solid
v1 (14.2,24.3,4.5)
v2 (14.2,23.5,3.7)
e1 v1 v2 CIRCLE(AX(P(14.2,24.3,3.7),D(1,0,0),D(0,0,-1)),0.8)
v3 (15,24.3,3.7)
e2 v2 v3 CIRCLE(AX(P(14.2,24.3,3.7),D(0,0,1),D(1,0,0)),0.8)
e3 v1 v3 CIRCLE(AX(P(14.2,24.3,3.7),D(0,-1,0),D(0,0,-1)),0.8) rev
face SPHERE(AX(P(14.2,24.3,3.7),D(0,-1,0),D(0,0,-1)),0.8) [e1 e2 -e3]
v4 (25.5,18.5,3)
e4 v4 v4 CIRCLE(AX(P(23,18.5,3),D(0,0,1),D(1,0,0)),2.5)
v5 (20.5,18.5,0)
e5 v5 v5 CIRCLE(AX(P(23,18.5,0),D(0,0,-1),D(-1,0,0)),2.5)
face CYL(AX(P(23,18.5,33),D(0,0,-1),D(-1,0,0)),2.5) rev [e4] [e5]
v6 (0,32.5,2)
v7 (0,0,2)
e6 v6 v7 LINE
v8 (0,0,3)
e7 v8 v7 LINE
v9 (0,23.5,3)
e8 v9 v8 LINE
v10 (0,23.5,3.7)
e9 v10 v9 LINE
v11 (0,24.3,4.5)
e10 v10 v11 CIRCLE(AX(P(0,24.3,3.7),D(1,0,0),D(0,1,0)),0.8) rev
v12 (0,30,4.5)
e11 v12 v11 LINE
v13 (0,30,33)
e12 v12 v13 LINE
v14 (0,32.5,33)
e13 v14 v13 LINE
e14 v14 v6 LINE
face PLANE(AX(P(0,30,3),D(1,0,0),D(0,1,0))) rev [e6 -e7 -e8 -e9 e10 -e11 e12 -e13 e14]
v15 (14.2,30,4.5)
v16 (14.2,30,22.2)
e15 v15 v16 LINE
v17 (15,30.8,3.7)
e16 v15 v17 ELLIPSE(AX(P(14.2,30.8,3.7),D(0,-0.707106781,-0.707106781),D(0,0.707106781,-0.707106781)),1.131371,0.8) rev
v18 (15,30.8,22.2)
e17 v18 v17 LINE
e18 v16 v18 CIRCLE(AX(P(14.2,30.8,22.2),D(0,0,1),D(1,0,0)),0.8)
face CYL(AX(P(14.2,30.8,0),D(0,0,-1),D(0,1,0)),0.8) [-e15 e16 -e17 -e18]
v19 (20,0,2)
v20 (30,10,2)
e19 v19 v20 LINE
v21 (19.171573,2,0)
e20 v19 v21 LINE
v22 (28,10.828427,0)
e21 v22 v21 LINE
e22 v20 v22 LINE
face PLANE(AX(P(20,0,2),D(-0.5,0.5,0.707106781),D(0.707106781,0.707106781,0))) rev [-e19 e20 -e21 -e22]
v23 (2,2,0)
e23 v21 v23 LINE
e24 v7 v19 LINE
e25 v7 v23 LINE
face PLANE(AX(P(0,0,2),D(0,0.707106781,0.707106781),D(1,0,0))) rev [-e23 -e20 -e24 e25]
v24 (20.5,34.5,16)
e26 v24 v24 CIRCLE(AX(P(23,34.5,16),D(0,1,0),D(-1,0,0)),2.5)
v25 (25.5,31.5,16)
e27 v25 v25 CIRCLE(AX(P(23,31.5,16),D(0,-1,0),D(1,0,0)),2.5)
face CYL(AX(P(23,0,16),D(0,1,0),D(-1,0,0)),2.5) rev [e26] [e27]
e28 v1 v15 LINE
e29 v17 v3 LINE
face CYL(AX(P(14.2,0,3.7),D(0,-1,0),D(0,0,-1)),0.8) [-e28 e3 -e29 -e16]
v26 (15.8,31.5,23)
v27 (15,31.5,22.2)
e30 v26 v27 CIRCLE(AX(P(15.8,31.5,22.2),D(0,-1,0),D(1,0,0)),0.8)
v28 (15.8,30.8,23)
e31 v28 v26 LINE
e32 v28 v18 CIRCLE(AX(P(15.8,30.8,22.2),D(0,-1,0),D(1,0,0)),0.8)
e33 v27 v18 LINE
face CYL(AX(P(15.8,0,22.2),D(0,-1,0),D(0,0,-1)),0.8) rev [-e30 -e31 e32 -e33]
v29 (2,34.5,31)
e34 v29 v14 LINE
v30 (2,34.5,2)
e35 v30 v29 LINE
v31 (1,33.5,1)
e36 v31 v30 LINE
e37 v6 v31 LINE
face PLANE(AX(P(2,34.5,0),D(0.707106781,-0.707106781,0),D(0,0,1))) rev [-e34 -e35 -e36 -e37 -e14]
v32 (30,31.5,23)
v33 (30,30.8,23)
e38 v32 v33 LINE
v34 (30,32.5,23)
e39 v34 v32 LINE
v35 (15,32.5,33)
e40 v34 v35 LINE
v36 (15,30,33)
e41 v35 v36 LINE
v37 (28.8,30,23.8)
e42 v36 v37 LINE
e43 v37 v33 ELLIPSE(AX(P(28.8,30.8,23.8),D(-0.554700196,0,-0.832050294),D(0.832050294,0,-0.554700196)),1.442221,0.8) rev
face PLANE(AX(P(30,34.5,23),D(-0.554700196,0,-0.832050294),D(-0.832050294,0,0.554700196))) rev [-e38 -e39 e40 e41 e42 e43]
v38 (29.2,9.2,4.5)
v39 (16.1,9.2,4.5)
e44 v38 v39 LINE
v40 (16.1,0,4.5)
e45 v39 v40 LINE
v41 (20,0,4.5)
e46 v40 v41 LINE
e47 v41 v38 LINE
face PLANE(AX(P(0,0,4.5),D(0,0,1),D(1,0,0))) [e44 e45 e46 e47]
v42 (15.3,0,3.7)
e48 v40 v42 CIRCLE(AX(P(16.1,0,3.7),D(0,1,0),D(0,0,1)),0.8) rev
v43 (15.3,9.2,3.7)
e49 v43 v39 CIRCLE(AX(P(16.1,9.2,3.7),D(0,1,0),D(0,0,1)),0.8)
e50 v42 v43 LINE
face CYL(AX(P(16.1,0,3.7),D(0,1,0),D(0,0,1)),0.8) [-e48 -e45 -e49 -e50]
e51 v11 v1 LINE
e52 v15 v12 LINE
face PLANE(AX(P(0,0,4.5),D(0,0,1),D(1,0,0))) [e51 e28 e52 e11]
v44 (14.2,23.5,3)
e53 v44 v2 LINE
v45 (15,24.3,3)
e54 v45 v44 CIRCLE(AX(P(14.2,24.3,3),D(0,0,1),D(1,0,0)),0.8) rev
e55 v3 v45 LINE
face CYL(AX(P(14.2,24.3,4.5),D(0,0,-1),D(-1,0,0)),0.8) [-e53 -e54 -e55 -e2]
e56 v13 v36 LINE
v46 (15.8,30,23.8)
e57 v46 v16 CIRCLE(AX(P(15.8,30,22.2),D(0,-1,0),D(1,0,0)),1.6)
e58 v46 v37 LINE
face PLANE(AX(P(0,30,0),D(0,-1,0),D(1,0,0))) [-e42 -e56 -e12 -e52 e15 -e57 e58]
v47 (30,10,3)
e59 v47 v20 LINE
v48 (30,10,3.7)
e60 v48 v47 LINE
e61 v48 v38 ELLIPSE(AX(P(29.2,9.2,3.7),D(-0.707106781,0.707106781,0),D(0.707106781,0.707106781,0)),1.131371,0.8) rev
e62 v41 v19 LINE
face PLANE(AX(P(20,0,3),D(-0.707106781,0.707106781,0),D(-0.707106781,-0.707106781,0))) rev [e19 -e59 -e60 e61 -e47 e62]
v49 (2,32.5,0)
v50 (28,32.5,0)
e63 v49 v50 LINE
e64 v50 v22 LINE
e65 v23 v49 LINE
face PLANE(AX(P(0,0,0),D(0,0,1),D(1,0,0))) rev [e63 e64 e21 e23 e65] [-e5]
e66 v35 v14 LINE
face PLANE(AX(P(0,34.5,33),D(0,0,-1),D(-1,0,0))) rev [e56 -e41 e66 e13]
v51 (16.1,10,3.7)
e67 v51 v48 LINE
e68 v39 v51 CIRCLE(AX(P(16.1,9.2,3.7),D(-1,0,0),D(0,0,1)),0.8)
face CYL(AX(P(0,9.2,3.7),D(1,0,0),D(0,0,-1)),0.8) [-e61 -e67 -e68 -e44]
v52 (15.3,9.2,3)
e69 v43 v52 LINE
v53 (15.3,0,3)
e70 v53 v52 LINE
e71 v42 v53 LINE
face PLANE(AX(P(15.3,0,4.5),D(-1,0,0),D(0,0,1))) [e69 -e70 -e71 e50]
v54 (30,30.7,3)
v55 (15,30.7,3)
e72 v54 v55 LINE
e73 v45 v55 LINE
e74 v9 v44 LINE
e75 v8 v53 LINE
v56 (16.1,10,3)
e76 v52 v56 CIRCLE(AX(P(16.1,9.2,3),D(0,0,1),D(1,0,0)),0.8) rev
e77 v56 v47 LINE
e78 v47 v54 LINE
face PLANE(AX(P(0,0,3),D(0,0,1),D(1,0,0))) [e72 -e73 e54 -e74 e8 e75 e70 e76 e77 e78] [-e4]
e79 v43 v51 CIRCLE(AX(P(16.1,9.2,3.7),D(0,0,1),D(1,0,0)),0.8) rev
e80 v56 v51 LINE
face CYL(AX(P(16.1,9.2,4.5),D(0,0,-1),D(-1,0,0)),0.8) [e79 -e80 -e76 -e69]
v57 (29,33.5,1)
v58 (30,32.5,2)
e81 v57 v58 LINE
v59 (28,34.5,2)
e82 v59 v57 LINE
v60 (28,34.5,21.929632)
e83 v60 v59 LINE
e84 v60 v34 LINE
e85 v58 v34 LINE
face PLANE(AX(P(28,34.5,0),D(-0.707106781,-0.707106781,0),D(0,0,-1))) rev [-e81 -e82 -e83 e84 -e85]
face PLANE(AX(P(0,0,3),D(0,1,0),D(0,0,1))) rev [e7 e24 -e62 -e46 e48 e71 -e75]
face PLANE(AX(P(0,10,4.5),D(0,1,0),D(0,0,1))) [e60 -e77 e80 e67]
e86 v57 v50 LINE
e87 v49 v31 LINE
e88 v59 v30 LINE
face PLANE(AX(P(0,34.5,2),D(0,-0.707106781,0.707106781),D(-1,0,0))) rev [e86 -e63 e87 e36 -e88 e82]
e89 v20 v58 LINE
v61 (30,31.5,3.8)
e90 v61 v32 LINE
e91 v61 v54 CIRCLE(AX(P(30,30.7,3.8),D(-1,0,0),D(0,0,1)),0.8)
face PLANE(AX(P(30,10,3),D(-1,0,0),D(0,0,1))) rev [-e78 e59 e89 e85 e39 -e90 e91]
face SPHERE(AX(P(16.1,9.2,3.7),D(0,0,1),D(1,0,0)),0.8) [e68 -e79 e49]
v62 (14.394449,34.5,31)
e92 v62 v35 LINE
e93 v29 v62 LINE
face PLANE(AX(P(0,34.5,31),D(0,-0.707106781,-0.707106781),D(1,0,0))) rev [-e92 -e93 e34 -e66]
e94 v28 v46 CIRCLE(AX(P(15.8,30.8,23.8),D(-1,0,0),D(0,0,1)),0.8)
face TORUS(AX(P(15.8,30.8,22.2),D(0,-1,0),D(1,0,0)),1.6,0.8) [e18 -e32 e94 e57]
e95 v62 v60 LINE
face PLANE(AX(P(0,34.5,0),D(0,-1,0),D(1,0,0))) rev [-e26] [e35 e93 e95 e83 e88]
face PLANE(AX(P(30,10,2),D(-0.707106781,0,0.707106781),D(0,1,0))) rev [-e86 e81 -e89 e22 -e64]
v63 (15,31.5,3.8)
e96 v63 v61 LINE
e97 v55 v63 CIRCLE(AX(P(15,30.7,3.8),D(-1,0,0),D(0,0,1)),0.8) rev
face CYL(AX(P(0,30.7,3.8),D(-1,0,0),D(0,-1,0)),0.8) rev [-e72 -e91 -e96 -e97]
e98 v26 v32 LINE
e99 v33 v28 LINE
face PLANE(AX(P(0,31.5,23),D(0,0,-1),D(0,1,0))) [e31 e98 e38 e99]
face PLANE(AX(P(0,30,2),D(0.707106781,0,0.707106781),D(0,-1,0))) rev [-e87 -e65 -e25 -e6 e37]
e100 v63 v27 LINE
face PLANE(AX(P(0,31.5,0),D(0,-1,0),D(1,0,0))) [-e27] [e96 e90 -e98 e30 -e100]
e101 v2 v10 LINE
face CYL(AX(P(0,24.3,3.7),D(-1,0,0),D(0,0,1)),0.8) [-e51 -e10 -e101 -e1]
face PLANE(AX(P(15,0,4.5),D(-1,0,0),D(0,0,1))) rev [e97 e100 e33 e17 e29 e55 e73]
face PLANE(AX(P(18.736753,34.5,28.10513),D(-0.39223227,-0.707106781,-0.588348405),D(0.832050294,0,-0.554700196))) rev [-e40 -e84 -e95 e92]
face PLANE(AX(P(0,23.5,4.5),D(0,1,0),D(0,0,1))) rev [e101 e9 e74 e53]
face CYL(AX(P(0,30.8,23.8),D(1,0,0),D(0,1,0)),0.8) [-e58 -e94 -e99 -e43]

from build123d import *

# Parameters (mm, degrees)
BOSS_EXTRUDE1_DEPTH = 3
SKETCH2_W           = 15
SKETCH2_H           = 6.5
BOSS_EXTRUDE2_DEPTH = 1.5
BOSS_EXTRUDE3_DEPTH = 4.5
CUT_EXTRUDE1_DEPTH  = 1.5
FILLET1_R           = 0.8
CHAMFER1_SIZE       = 2
CHAMFER2_SIZE       = 2
FILLET2_R           = 0.8
SKETCH5_R           = 2.5
CUT_EXTRUDE2_DEPTH  = 57.384838388
SKETCH6_R           = 2.5
CUT_EXTRUDE3_DEPTH  = 57.384838388


with BuildPart() as part:
    # Sketch1 → Boss-Extrude1 (new body)
    with BuildSketch(Plane.XY):
        Polygon((0, 0), (20, 0), (30, 10), (30, 30), (0, 30), align=None)
    extrude(amount=BOSS_EXTRUDE1_DEPTH)

    # Sketch2 → Boss-Extrude2 (add)
    with BuildSketch(Plane.XY.offset(3)):
        Polygon((30, 10), (15.3, 10), (15.3, 0), (20, 0), align=None)
        with Locations((7.5, 26.75)):
            Rectangle(SKETCH2_W, SKETCH2_H)
    extrude(amount=BOSS_EXTRUDE2_DEPTH)

    # Sketch3 → Boss-Extrude3 (add)
    with BuildSketch(Plane(origin=(0, 30, 0), x_dir=(1, 0, 0), z_dir=(0, 1, 0))):
        Polygon((0, -3), (0, -33), (15, -33), (30, -23), (30, -3), (30, 0), (0, 0), align=None)
    extrude(amount=BOSS_EXTRUDE3_DEPTH)

    # Sketch4 → Cut-Extrude1 (cut)
    with BuildSketch(Plane.XZ.offset(-30)):
        Polygon((15, 23), (30, 23), (30, 3), (15, 3), (15, 4.5), align=None)
    extrude(amount=-CUT_EXTRUDE1_DEPTH, mode=Mode.SUBTRACT)

    # Fillet1
    fillet1_edges = [part.edges().sort_by_distance(p)[0] for p in [
        (15, 23.5, 3.75),
        (7.5, 23.5, 4.5),
        (15, 26.75, 4.5),
        (15.3, 5, 4.5),
        (15.3, 10, 3.75),
        (22.65, 10, 4.5),
        (15, 30, 13.75),
        (22.5, 30, 23),
        (15, 30.75, 23),
    ]]
    fillet(fillet1_edges, radius=FILLET1_R)

    # Chamfer1
    chamfer1_edges = [part.edges().sort_by_distance(p)[0] for p in [
        (15, 34.5, 0),
    ]]
    chamfer(chamfer1_edges, length=CHAMFER1_SIZE)

    # Chamfer2
    # the kernel refuses this chamfer: 2 mm, written as the material it takes off along each edge
    with BuildSketch(Plane(origin=(30, 37.643365976, 0), x_dir=(-0.9996219169112968, 0, -0.02749587661058639), z_dir=(0, -1, 0))) as chamfer2_piece_1:
        Polygon((CHAMFER2_SIZE * 0.999621916911, -CHAMFER2_SIZE * 0.0274958766106), (-CHAMFER2_SIZE * 0.0274958766106, -CHAMFER2_SIZE * 0.999621916911), (0, 0), align=None)
    extrude(amount=32.786731952, mode=Mode.SUBTRACT)
    with BuildSketch(Plane(origin=(16.36309104, -3.63690896, 0), x_dir=(-0.7068394360706732, 0.7068394360706737, -0.027495876610586376), z_dir=(0.7071067811865478, 0.7071067811865474, 0))) as chamfer2_piece_2:
        Polygon((CHAMFER2_SIZE * 0.999621916911, CHAMFER2_SIZE * 0.0274958766106), (-CHAMFER2_SIZE * 0.0274958766106, CHAMFER2_SIZE * 0.999621916911), (0, 0), align=None)
    extrude(amount=24.428867576, mode=Mode.SUBTRACT)
    with BuildSketch(Plane(origin=(-5.143365976, 0, 0), x_dir=(0, 0.9996219169112968, -0.027495876610586372), z_dir=(1, 0, 0))) as chamfer2_piece_3:
        Polygon((CHAMFER2_SIZE * 0.999621916911, CHAMFER2_SIZE * 0.0274958766106), (-CHAMFER2_SIZE * 0.0274958766106, CHAMFER2_SIZE * 0.999621916911), (0, 0), align=None)
    extrude(amount=30.286731952, mode=Mode.SUBTRACT)
    with BuildSketch(Plane(origin=(0, 37.643365976, 0), x_dir=(-0.027495876610586372, 0, 0.9996219169112968), z_dir=(0, -1, 0))) as chamfer2_piece_4:
        Polygon((CHAMFER2_SIZE * 0.999621916911, -CHAMFER2_SIZE * 0.0274958766106), (-CHAMFER2_SIZE * 0.0274958766106, -CHAMFER2_SIZE * 0.999621916911), (0, 0), align=None)
    extrude(amount=42.786731952, mode=Mode.SUBTRACT)
    with BuildSketch(Plane(origin=(0, 34.5, 38.143365976), x_dir=(-0.0274958766105864, -0.9996219169112968, 0), z_dir=(0, 0, -1))) as chamfer2_piece_5:
        Polygon((CHAMFER2_SIZE * 0.999621916911, -CHAMFER2_SIZE * 0.0274958766106), (-CHAMFER2_SIZE * 0.0274958766106, -CHAMFER2_SIZE * 0.999621916911), (0, 0), align=None)
    extrude(amount=41.286731952, mode=Mode.SUBTRACT)
    with BuildSketch(Plane(origin=(30, 34.5, -3.143365976), x_dir=(-0.9996219169112968, 0.027495876610585647, 0), z_dir=(0, 0, 1))) as chamfer2_piece_6:
        Polygon((CHAMFER2_SIZE * 0.999621916911, CHAMFER2_SIZE * 0.0274958766106), (-CHAMFER2_SIZE * 0.0274958766106, CHAMFER2_SIZE * 0.999621916911), (0, 0), align=None)
    extrude(amount=31.286731952, mode=Mode.SUBTRACT)
    with BuildSketch(Plane(origin=(10.720460826, 34.5, 35.853026116), x_dir=(-0.5544904734617357, 0.027495876610585605, -0.8317357101926042), z_dir=(0.8320502943378439, 0, -0.5547001962252288))) as chamfer2_piece_7:
        Polygon((CHAMFER2_SIZE * 0.999621916911, -CHAMFER2_SIZE * 0.0274958766106), (-CHAMFER2_SIZE * 0.0274958766106, -CHAMFER2_SIZE * 0.999621916911), (0, 0), align=None)
    extrude(amount=28.314488329, mode=Mode.SUBTRACT)
    with BuildSketch(Plane(origin=(-5.143365976, 34.5, 33), x_dir=(0, 0.027495876610585647, -0.9996219169112968), z_dir=(1, 0, 0))) as chamfer2_piece_8:
        Polygon((CHAMFER2_SIZE * 0.999621916911, -CHAMFER2_SIZE * 0.0274958766106), (-CHAMFER2_SIZE * 0.0274958766106, -CHAMFER2_SIZE * 0.999621916911), (0, 0), align=None)
    extrude(amount=25.286731952, mode=Mode.SUBTRACT)

    # Fillet2
    fillet2_edges = [part.edges().sort_by_distance(p)[0] for p in [
        (22.5, 31.5, 3),
    ]]
    fillet(fillet2_edges, radius=FILLET2_R)

    # Sketch5 → Cut-Extrude2 (cut, through all)
    with BuildSketch(Plane(origin=(0, 0, 0), x_dir=(-1, 0, 0), z_dir=(0, 0, -1))):
        with Locations((-23, 18.5)):
            Circle(SKETCH5_R)
    extrude(amount=-CUT_EXTRUDE2_DEPTH, mode=Mode.SUBTRACT)

    # Sketch6 → Cut-Extrude3 (cut, through all)
    with BuildSketch(Plane(origin=(0, 34.5, 0), x_dir=(1, 0, 0), z_dir=(0, 1, 0))):
        with Locations(Location((23, -16, 0), (0, 0, 180))):
            Circle(SKETCH6_R)
    extrude(amount=-CUT_EXTRUDE3_DEPTH, mode=Mode.SUBTRACT)


solid = part.part
